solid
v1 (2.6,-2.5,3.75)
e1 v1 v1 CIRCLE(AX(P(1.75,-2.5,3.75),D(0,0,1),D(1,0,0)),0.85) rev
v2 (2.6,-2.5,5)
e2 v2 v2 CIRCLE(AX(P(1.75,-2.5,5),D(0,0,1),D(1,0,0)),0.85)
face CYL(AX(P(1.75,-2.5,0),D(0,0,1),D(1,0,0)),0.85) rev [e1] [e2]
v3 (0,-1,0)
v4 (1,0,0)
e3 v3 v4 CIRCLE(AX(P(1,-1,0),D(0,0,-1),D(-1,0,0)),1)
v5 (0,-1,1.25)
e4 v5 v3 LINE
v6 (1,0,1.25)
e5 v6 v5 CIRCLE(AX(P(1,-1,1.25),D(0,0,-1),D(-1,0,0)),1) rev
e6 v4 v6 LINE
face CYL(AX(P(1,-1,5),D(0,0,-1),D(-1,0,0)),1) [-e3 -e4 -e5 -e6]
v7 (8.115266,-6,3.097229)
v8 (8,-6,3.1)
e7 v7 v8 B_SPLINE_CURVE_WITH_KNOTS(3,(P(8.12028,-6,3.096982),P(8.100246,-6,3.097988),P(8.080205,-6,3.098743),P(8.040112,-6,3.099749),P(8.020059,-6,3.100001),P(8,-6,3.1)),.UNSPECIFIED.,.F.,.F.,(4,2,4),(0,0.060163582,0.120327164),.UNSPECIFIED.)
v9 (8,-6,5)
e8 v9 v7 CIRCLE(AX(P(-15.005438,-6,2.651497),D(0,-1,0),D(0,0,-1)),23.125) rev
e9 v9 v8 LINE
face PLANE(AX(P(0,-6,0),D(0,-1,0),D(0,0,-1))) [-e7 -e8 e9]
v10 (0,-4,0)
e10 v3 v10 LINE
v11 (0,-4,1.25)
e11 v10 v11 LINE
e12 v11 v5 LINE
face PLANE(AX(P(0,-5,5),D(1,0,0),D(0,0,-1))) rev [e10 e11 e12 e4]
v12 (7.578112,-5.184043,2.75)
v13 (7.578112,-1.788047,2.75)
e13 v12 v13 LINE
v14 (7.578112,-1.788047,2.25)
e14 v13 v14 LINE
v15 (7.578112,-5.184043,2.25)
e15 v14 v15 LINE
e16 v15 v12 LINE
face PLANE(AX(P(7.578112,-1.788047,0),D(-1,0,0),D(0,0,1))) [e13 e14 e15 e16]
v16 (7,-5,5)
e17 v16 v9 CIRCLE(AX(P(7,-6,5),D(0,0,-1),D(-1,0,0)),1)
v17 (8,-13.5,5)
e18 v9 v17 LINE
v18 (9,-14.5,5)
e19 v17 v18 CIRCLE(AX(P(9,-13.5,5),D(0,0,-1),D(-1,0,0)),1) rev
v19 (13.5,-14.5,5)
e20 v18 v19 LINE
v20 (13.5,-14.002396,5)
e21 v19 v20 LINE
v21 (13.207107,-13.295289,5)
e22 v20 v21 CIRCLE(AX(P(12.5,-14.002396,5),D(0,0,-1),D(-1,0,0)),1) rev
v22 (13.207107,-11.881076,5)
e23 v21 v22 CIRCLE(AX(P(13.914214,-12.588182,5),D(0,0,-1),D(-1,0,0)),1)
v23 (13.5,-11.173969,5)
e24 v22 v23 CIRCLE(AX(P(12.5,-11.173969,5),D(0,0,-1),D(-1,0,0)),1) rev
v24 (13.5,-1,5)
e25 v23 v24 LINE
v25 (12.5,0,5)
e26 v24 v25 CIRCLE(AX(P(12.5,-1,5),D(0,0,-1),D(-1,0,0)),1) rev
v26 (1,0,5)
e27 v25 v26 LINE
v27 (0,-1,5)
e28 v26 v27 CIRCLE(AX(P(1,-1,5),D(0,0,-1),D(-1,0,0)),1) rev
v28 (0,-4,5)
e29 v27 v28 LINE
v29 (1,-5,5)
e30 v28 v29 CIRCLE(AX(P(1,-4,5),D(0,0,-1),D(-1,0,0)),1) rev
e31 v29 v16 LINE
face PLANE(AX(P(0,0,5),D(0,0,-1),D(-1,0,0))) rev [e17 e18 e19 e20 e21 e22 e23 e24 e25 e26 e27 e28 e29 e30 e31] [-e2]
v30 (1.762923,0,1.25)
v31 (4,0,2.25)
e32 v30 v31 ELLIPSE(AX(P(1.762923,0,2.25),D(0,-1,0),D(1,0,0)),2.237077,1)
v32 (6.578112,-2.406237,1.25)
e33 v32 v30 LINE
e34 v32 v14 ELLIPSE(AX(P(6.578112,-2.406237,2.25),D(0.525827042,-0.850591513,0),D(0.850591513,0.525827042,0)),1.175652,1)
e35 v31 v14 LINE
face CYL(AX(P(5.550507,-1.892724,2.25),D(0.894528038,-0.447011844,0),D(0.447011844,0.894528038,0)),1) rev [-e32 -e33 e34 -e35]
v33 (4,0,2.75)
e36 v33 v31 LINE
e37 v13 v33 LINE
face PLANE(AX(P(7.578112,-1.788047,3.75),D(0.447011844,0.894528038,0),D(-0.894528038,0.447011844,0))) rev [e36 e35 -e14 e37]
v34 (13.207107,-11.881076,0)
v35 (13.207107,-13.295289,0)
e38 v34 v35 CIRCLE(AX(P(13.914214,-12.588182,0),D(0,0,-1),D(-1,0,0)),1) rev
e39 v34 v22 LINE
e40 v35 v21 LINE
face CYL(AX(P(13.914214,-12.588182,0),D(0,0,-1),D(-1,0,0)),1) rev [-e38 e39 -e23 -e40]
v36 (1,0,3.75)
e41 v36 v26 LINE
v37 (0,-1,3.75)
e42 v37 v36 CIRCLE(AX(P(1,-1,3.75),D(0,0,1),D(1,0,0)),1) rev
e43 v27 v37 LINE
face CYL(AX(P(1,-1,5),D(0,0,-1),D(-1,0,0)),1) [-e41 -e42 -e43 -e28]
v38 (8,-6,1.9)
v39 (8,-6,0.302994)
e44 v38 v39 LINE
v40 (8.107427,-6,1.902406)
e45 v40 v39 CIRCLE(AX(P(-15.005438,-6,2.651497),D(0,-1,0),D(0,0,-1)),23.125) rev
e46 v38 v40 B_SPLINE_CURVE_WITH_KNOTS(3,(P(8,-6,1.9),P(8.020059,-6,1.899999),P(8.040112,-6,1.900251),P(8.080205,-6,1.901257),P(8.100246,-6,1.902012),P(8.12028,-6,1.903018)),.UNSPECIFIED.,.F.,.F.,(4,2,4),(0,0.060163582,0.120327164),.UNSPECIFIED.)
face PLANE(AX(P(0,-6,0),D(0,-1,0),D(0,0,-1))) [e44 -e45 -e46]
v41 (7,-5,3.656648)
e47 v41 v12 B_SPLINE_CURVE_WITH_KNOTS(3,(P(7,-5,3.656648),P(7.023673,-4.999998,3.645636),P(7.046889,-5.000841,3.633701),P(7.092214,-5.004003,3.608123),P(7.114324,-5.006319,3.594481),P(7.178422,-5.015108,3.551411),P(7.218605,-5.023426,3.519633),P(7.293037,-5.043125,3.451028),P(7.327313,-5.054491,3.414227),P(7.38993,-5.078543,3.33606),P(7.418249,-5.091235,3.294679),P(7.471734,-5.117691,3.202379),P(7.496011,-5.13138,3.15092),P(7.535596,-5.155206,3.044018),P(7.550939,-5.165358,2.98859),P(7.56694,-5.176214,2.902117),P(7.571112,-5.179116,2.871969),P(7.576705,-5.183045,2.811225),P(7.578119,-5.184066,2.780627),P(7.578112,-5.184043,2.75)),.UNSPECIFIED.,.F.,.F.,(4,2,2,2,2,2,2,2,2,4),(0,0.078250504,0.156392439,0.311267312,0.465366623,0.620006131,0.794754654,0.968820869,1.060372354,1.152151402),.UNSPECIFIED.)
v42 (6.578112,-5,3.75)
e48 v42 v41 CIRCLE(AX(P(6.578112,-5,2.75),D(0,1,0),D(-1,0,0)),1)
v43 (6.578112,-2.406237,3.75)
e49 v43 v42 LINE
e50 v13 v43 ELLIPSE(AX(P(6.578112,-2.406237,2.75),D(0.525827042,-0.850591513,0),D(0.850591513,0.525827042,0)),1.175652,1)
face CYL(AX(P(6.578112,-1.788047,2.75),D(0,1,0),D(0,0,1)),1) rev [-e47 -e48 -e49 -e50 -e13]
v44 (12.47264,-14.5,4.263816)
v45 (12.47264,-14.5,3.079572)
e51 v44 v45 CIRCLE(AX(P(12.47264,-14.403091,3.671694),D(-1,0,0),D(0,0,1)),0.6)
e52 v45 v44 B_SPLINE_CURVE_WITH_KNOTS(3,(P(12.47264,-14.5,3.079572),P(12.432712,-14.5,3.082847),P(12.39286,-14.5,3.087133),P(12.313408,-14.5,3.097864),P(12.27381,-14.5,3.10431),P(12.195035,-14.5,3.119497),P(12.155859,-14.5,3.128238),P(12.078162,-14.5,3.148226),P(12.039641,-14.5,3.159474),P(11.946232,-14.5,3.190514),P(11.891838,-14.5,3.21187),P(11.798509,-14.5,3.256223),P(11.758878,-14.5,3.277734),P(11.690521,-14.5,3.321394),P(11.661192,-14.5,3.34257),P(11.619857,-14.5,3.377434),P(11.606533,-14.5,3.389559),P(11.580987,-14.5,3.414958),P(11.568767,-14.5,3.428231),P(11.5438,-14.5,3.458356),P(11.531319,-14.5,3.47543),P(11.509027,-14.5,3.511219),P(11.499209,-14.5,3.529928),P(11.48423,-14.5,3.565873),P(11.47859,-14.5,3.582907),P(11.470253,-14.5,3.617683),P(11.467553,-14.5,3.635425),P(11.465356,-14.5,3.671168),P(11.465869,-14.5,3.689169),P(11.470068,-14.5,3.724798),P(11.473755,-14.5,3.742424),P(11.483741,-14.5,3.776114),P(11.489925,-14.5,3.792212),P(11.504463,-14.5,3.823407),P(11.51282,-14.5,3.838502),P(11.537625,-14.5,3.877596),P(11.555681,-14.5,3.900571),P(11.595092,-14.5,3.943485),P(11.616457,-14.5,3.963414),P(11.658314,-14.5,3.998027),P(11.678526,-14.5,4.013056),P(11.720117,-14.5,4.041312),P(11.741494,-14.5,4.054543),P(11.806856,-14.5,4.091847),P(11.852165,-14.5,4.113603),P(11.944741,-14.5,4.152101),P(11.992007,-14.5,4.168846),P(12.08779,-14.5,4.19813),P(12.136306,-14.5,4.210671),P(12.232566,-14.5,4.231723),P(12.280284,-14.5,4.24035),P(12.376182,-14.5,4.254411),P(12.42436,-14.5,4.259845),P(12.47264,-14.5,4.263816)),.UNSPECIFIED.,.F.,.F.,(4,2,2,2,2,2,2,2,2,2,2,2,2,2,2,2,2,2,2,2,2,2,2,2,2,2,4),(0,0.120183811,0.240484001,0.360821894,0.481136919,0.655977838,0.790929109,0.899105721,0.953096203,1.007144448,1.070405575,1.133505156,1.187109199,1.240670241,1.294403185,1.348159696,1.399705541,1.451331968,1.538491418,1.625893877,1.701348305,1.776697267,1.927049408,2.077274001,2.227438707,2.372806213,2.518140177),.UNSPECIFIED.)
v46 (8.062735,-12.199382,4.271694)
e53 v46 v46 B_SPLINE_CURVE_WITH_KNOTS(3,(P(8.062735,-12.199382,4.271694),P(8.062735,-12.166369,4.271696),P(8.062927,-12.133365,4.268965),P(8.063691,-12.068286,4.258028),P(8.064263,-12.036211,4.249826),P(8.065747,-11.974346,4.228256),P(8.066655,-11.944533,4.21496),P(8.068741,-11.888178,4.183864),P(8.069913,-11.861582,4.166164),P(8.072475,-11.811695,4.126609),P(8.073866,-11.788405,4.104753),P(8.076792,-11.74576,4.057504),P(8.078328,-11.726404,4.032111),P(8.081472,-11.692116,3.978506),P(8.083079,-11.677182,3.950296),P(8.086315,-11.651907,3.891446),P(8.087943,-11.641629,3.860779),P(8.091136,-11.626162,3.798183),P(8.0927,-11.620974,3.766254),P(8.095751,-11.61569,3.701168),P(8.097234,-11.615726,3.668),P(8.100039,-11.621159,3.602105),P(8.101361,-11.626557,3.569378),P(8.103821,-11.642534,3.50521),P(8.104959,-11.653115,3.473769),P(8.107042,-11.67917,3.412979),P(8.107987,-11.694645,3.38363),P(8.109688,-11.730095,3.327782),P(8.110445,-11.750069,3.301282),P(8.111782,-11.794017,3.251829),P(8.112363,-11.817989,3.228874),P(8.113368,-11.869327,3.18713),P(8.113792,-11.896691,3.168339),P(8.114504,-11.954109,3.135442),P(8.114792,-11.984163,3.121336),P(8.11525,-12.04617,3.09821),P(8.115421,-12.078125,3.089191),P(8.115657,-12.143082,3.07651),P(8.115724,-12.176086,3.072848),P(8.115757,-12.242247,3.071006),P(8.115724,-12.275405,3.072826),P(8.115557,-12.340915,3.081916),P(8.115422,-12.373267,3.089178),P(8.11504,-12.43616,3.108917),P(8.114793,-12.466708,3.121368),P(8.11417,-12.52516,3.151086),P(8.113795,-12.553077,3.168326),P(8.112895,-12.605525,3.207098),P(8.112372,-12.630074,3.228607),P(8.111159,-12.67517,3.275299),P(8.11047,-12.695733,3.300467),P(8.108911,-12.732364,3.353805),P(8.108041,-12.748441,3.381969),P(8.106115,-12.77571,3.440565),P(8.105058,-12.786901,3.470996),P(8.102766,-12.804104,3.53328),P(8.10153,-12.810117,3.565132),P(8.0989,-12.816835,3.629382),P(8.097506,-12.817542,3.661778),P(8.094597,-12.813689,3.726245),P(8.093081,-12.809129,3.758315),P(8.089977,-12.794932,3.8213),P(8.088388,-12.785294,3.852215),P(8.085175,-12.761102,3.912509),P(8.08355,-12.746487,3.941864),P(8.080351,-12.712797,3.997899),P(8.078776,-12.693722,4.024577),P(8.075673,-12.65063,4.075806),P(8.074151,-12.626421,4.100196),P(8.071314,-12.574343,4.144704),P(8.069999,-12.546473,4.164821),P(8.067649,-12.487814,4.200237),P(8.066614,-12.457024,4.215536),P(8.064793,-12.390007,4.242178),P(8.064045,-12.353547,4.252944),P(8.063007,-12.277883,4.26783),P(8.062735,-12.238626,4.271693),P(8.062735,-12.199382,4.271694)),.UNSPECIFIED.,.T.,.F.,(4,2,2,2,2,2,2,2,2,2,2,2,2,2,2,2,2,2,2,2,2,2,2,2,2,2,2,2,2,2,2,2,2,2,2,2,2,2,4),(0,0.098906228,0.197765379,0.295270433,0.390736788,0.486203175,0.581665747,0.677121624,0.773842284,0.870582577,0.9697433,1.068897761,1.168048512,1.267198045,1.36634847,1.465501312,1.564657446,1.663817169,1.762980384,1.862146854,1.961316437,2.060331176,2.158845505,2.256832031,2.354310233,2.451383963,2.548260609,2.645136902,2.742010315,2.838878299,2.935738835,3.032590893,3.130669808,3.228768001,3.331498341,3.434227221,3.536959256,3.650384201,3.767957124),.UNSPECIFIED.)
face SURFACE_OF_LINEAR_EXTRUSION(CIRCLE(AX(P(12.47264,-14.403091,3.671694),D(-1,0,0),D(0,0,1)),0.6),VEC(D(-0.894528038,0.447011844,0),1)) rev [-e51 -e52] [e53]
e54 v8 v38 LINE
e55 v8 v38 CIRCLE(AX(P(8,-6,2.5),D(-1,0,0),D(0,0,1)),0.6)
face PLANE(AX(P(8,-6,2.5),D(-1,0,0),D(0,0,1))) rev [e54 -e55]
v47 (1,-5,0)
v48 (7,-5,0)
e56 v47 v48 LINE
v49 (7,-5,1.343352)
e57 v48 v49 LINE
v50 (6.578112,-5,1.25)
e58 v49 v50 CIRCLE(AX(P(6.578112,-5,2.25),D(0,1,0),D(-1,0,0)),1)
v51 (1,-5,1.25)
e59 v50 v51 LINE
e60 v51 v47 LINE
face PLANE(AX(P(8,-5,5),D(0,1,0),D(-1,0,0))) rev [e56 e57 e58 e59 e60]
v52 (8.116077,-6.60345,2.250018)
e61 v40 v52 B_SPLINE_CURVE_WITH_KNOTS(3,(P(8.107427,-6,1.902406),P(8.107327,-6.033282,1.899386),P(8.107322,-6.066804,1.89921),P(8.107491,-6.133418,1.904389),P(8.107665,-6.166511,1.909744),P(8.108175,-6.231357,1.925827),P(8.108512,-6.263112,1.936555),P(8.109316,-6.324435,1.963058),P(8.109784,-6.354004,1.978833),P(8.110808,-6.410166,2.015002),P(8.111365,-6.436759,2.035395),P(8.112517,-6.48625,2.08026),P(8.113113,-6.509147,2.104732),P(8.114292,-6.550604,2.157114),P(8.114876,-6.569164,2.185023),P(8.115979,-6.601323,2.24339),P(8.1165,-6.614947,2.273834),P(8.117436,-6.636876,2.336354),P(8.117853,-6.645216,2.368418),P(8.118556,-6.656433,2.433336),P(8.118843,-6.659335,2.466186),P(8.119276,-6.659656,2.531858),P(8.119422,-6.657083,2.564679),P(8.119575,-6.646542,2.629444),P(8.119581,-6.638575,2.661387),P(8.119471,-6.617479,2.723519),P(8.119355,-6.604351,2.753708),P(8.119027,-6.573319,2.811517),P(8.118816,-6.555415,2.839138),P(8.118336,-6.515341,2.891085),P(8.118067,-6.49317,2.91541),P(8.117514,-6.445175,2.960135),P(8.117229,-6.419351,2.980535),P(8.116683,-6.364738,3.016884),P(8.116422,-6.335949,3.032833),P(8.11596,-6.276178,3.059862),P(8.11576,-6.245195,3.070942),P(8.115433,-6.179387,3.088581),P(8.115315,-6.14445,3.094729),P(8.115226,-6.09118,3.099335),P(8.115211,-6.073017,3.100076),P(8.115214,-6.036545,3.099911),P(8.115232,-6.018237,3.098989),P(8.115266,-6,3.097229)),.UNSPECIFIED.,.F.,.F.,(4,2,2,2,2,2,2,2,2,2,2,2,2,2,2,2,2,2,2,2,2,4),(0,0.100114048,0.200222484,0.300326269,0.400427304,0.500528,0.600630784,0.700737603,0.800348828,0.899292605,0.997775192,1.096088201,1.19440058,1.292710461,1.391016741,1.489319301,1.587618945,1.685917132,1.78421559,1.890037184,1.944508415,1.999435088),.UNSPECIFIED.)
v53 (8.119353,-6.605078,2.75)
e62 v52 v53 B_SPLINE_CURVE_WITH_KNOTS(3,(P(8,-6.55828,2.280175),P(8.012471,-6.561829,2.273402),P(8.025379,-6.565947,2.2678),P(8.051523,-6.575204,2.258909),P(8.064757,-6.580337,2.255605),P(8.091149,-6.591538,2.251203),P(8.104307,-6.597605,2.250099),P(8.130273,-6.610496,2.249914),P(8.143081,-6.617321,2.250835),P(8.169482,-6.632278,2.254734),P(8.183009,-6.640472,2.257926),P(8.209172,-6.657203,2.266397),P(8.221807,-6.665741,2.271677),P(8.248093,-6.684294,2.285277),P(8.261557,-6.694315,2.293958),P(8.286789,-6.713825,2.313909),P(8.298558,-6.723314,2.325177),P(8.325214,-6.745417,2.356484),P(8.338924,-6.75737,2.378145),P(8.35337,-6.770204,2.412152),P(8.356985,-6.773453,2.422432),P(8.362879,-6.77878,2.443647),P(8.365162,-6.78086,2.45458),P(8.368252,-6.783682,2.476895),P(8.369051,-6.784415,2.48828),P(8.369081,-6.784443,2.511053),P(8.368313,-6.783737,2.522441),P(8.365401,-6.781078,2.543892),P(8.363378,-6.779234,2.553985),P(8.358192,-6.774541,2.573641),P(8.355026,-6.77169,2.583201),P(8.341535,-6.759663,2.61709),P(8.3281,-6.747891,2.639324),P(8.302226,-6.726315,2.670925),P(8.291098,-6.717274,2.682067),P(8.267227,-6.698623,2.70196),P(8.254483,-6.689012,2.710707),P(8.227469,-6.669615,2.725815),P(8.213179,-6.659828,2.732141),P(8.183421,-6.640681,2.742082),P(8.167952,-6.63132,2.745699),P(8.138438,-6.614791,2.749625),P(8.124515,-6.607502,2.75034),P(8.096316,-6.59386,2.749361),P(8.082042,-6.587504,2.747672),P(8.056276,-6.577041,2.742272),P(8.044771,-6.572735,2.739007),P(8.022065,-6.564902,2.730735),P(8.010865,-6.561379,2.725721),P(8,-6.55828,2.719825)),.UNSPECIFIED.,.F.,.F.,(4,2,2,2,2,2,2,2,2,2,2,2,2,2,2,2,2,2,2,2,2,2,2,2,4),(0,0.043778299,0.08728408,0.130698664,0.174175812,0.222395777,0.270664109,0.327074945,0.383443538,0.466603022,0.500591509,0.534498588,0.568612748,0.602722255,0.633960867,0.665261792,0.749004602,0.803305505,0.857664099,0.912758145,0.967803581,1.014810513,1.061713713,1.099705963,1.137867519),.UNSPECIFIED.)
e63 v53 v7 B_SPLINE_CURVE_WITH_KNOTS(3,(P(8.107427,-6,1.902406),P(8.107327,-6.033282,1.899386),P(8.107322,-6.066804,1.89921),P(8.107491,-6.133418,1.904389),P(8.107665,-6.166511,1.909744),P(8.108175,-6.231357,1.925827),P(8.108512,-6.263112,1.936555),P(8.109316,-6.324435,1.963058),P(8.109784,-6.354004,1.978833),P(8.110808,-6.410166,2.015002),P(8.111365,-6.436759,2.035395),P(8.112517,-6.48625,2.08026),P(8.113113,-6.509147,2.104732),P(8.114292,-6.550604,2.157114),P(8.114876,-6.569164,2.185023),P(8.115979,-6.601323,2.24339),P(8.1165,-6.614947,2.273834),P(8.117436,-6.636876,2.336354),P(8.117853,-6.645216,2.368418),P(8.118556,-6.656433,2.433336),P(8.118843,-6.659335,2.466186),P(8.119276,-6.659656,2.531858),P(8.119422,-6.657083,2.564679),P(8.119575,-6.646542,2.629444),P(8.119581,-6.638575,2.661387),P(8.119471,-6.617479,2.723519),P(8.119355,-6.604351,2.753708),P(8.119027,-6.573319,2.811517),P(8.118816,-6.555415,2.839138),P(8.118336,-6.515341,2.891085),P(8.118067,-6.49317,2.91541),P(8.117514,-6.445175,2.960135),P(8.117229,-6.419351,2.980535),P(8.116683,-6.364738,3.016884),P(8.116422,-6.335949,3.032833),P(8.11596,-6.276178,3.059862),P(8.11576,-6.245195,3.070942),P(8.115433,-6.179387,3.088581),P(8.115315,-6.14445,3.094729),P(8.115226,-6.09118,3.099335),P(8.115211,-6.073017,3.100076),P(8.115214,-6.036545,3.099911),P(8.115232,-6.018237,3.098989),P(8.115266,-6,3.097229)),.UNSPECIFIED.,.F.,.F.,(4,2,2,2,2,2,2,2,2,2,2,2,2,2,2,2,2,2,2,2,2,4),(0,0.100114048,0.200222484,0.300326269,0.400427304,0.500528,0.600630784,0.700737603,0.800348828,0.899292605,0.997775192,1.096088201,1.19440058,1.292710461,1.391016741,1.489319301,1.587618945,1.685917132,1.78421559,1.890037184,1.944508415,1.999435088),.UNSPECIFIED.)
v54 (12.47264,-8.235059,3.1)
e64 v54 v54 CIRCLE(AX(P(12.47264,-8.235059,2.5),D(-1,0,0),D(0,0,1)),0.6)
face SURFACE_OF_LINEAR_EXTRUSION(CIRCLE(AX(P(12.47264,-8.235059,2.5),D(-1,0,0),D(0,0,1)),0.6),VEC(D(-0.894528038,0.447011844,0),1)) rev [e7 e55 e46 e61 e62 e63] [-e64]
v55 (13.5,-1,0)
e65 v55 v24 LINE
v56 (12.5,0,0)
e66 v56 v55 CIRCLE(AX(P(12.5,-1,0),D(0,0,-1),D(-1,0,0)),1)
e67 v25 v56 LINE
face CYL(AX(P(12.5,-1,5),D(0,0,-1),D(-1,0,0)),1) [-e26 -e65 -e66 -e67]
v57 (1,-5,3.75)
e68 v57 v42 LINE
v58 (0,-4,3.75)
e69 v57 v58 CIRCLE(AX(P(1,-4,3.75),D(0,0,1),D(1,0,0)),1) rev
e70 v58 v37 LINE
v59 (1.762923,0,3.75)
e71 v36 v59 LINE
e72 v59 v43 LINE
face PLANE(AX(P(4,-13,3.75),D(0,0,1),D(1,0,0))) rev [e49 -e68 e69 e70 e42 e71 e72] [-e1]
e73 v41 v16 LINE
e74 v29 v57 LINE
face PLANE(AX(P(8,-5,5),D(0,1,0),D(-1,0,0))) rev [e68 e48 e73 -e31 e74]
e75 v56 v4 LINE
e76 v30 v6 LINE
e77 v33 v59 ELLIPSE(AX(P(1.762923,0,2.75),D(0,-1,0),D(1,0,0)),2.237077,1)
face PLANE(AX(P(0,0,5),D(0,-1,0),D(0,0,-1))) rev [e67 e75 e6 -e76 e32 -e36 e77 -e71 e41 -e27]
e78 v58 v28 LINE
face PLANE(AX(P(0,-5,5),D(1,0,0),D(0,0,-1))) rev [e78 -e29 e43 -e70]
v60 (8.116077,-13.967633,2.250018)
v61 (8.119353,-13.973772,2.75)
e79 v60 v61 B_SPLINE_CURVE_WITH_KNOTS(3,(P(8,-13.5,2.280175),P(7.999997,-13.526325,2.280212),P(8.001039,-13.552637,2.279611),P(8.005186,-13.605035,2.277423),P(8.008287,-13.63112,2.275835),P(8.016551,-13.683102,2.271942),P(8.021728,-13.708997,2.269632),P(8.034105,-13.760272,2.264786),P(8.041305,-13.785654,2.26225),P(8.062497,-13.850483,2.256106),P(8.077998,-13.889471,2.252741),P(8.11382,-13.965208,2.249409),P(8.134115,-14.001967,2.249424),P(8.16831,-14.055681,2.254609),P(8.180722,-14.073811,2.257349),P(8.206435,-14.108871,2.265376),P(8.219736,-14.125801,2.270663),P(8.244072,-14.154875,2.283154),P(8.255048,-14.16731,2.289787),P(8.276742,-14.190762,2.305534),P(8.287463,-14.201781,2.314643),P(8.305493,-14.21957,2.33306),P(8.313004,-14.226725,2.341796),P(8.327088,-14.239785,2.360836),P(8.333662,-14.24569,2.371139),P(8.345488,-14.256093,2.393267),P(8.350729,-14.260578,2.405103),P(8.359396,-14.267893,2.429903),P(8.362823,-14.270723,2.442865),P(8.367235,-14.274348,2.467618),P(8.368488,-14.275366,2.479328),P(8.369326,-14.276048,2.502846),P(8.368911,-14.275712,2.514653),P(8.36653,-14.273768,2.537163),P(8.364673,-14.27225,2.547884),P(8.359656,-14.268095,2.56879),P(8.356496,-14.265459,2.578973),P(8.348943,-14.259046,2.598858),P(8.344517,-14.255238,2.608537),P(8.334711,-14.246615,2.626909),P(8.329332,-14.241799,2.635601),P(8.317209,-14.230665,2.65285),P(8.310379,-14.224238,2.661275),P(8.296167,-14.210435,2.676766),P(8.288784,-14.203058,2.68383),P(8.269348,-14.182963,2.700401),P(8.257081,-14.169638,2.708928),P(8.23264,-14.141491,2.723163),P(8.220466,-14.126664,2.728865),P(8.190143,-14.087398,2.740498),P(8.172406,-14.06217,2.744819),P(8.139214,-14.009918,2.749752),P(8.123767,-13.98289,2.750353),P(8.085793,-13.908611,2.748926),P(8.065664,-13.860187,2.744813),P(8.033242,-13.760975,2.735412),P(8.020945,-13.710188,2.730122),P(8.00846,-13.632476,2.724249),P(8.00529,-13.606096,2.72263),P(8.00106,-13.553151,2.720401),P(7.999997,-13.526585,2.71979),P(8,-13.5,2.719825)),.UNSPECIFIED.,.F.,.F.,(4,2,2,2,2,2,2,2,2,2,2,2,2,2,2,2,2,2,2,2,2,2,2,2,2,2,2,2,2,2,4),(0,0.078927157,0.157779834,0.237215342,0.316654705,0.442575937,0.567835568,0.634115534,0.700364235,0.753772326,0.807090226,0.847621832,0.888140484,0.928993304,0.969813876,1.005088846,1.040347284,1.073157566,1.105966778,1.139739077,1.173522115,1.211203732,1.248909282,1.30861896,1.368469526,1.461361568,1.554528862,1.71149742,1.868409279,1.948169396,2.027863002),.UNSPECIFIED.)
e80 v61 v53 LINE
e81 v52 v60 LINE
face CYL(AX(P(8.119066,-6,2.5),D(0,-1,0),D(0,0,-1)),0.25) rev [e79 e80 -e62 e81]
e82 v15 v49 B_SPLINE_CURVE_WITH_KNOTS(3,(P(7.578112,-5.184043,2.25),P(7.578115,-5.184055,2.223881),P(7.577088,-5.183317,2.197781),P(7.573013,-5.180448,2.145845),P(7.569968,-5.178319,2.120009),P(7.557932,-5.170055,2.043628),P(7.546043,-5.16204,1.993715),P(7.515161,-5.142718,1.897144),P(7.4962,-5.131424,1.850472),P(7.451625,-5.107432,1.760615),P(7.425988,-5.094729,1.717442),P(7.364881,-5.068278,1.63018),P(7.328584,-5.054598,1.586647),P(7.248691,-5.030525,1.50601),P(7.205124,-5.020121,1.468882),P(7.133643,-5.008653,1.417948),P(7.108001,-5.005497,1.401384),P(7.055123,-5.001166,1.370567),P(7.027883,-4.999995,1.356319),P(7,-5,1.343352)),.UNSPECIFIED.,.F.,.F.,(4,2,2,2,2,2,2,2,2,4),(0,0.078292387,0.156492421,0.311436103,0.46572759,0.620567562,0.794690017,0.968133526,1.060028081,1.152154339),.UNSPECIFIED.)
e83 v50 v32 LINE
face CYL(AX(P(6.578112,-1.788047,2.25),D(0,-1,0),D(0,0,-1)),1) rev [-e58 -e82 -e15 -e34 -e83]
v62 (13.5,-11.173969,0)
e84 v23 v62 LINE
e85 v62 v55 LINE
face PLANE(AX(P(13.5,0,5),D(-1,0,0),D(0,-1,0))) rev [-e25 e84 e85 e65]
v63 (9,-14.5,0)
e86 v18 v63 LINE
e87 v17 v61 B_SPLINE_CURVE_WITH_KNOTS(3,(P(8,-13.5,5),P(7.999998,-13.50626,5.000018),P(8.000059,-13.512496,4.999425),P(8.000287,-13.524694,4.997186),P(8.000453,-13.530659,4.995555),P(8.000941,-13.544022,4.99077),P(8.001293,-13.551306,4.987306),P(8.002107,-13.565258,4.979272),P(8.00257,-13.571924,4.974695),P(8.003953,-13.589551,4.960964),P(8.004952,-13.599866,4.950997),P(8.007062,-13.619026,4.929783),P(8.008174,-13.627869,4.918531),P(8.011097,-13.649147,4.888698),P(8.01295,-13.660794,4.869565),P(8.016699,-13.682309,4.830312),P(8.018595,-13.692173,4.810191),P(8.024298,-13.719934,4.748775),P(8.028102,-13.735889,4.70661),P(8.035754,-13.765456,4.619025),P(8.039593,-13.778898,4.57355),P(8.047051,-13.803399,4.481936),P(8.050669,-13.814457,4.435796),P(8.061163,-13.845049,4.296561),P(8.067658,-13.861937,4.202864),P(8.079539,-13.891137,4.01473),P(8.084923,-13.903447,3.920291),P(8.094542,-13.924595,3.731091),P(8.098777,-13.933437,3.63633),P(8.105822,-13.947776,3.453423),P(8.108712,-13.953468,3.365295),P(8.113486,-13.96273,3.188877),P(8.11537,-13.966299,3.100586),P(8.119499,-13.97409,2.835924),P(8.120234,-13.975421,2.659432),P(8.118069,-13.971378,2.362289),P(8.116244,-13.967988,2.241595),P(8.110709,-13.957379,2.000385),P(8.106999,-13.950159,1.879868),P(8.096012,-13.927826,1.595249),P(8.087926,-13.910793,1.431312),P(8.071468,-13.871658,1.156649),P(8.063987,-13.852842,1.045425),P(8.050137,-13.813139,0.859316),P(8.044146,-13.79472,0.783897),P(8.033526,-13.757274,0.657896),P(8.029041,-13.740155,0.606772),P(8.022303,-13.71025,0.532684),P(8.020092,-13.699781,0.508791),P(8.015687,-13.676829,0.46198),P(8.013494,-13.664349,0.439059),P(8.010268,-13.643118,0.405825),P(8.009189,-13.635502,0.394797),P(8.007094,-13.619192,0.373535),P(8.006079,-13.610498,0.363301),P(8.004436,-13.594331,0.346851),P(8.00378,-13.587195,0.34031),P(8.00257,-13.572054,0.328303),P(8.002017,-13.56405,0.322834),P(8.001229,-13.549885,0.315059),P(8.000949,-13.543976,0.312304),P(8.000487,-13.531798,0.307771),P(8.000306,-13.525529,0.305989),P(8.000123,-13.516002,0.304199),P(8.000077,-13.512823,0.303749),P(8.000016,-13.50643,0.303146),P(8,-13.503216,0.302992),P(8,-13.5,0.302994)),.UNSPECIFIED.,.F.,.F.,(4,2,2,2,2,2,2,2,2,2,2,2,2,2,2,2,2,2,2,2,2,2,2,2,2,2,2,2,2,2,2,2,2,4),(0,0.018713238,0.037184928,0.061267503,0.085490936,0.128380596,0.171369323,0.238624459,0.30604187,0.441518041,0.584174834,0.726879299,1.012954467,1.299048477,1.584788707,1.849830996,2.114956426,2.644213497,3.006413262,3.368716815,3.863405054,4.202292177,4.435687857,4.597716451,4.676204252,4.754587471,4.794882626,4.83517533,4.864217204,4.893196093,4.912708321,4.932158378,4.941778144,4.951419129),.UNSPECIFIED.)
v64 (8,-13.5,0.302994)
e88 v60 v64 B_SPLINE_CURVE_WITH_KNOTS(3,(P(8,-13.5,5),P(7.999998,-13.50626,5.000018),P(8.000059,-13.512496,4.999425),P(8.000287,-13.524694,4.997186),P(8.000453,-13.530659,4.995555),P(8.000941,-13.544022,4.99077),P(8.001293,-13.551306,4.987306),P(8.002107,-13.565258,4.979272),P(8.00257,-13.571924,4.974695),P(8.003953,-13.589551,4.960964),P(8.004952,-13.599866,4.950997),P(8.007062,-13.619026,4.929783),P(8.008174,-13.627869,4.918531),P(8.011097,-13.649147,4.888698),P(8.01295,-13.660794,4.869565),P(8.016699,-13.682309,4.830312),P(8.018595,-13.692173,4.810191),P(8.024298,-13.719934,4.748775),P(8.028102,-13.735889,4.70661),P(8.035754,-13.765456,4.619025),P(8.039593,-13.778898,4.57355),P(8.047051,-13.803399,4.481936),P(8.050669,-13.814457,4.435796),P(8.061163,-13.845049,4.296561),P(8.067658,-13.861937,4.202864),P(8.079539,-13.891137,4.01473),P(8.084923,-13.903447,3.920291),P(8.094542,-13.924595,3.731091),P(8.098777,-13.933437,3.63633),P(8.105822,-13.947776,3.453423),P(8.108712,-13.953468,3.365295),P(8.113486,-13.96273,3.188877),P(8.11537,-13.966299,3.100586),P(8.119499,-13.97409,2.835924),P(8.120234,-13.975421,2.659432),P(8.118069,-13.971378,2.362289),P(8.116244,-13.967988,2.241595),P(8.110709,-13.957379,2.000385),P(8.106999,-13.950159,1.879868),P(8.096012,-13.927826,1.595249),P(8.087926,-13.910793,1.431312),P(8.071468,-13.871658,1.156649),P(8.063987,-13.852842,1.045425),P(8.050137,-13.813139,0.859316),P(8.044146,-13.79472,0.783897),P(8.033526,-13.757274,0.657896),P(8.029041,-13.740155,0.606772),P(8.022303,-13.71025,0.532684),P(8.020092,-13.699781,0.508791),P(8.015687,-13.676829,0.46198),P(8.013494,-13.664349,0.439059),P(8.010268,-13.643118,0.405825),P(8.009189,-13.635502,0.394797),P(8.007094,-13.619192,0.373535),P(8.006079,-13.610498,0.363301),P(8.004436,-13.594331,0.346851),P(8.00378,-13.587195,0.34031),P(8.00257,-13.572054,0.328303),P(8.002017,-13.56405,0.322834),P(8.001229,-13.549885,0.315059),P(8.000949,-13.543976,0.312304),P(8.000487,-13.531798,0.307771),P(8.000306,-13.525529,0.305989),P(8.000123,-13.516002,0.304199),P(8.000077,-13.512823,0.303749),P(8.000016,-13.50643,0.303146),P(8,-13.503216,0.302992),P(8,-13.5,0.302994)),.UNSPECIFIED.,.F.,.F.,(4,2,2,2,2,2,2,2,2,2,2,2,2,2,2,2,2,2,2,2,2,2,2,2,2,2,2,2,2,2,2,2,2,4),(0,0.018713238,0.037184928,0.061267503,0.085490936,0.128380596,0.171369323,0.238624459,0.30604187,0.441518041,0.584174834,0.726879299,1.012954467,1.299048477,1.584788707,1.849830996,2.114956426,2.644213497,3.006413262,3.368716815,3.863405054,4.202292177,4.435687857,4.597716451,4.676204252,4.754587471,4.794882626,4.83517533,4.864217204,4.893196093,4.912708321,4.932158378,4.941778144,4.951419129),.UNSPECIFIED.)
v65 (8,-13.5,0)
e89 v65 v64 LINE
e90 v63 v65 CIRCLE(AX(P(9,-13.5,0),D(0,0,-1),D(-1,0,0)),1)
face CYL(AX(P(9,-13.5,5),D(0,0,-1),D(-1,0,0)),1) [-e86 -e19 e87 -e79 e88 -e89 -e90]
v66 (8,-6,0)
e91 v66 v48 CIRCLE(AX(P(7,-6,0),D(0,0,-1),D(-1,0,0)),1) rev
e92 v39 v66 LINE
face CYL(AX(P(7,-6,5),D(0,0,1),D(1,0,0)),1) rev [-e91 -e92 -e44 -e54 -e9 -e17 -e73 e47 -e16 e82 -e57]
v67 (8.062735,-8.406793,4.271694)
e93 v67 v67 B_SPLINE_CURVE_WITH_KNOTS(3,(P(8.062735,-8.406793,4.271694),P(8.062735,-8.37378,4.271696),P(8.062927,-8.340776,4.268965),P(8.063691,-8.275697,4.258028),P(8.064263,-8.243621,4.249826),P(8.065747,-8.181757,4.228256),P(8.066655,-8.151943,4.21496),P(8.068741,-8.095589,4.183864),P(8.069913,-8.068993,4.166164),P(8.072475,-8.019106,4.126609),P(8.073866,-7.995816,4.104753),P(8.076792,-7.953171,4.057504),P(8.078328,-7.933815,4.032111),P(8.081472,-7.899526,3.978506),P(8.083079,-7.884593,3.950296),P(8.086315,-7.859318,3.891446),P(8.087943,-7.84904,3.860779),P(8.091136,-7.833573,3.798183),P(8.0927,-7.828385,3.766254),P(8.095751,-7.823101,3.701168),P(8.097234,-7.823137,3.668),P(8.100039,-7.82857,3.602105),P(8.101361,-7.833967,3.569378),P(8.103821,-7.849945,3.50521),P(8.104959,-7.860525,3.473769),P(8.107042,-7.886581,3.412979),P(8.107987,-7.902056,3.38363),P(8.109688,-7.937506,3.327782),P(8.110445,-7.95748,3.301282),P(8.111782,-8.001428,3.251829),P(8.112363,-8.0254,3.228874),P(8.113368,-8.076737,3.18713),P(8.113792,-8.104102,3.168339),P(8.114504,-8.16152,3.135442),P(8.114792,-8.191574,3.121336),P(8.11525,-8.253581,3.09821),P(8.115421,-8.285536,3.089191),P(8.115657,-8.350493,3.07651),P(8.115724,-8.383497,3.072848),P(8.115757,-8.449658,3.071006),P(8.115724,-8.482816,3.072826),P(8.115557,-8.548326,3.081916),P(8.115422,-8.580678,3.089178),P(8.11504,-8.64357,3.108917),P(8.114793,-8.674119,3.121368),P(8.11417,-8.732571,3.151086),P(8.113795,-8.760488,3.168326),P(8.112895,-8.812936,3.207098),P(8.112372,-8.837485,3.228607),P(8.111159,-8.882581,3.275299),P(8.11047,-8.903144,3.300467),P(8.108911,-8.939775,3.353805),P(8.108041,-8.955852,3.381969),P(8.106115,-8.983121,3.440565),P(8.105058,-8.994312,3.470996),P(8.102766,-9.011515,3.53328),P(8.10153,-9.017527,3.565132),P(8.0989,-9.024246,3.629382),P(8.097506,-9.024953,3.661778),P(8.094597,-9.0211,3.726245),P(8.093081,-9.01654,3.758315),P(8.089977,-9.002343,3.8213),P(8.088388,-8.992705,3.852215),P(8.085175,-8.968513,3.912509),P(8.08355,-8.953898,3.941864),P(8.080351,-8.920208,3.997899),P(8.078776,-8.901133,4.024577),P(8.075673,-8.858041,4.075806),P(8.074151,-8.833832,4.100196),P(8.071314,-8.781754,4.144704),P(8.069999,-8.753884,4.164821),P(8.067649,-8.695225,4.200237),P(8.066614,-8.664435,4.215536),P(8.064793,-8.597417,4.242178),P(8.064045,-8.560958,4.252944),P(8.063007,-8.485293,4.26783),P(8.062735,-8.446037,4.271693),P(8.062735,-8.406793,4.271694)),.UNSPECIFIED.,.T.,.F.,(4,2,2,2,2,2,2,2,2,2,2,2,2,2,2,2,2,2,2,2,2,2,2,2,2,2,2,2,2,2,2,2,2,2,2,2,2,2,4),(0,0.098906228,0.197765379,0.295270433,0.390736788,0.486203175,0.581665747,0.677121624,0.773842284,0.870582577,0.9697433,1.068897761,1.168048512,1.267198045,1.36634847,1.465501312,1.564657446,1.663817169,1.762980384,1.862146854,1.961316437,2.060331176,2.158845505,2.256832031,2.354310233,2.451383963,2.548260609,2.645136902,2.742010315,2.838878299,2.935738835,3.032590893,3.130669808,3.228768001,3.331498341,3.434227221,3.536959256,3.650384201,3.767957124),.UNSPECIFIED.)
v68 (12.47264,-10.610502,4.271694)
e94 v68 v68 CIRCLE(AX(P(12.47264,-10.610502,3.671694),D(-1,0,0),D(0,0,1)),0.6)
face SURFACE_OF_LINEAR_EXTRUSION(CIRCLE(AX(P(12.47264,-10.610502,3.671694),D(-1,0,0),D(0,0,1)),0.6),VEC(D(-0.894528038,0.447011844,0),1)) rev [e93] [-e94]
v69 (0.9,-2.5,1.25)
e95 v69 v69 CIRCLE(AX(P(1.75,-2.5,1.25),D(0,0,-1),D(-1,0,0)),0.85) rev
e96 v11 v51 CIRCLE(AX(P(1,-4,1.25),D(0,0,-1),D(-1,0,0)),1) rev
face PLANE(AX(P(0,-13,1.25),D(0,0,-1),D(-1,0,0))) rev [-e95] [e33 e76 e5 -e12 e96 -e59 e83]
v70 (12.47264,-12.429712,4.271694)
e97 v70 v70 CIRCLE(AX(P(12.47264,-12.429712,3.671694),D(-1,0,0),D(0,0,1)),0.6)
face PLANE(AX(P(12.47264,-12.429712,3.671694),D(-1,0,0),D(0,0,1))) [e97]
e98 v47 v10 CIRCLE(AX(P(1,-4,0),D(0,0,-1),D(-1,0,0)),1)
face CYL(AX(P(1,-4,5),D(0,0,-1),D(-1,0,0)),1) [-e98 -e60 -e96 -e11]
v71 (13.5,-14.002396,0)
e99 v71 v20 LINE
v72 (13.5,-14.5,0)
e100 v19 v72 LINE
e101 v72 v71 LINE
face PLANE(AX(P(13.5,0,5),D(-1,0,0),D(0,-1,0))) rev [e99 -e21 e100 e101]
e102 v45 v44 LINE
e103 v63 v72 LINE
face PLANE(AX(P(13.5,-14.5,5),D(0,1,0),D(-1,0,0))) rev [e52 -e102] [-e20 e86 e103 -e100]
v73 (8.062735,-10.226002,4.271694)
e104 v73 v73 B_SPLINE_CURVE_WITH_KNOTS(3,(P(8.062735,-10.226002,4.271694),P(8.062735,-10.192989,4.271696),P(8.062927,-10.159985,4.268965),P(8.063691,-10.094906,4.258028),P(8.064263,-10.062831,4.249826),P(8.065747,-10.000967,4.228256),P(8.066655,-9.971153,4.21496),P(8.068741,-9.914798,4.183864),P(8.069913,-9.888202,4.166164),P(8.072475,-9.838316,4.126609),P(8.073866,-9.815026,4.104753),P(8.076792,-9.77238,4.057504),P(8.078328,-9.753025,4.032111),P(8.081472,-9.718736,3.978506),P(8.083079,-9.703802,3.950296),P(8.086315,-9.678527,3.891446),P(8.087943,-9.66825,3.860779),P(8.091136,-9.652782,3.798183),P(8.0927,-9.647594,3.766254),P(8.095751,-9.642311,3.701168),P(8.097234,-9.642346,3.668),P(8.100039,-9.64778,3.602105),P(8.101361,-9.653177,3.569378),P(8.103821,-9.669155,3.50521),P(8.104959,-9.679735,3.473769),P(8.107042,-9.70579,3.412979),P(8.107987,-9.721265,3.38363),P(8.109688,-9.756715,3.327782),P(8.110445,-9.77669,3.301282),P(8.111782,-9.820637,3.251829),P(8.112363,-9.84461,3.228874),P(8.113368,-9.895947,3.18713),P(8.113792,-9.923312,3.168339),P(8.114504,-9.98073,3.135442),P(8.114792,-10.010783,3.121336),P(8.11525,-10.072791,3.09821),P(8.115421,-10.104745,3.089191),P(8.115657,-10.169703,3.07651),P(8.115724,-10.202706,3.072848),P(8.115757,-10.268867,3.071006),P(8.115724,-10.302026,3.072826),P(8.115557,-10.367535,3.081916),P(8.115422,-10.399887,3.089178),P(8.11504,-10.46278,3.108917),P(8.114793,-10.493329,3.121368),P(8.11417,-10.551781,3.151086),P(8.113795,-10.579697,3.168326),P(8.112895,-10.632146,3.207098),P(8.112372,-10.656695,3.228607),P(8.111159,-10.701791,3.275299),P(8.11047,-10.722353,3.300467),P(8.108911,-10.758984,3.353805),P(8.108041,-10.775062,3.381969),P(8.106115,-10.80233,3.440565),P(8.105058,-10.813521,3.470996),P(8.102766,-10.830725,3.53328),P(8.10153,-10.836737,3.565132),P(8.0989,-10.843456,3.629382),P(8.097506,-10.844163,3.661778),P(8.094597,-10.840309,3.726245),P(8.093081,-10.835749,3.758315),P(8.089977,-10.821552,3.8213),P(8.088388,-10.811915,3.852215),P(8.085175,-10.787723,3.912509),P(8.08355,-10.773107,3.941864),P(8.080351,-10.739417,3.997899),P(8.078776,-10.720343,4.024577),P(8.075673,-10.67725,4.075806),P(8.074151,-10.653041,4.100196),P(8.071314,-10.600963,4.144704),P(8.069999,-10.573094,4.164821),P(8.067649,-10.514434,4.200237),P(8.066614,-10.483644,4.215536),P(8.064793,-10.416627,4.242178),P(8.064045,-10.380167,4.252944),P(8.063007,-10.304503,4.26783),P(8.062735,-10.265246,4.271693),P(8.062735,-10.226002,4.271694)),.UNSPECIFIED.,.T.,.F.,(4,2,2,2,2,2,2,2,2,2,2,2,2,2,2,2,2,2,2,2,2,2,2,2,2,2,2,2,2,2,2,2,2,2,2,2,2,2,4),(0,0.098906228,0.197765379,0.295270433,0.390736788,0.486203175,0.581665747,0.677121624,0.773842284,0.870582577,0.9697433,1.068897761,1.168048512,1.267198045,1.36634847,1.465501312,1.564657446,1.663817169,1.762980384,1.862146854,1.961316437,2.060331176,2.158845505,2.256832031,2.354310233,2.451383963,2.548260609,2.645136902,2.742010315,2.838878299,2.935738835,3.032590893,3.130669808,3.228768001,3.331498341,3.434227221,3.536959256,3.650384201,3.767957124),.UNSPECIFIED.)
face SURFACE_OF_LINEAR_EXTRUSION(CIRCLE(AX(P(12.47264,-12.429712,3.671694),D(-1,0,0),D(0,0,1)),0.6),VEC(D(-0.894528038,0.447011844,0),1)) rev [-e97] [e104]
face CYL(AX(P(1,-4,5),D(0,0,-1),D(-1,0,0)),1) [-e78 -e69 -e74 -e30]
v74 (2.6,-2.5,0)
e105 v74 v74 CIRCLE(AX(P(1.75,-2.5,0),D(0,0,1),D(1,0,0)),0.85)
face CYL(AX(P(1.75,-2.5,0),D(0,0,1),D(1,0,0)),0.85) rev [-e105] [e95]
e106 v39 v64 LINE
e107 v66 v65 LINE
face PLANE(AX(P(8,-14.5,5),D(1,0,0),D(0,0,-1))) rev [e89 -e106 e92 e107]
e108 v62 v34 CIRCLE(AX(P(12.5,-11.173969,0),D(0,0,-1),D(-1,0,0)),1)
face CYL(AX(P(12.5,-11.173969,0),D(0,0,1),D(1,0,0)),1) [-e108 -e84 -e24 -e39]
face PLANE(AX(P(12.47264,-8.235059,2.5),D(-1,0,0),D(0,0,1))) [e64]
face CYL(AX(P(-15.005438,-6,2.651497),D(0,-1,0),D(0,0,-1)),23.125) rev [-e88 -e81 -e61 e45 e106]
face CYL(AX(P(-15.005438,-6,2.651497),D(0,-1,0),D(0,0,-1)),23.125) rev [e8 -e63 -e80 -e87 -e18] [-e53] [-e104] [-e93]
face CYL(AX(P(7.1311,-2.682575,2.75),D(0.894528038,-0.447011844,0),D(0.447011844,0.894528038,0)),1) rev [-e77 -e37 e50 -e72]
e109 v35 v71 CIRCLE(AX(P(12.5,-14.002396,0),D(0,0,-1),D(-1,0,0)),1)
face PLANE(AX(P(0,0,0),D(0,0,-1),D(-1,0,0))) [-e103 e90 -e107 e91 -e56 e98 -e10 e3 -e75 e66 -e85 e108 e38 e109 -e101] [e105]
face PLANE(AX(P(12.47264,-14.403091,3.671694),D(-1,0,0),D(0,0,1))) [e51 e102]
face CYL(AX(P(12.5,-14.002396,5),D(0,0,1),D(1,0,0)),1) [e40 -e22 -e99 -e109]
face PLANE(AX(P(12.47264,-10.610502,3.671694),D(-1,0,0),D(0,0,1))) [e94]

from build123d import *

# Parameters (mm, degrees)
BOSS_EXTRUDE1_DEPTH = 5
SKETCH4_R           = 0.85
CUT_EXTRUDE3_DEPTH  = 21.432816742
SKETCH5_W           = 4
SKETCH5_H           = 2.5
CUT_EXTRUDE4_DEPTH  = 13
FILLET4_R           = 1
CUT_EXTRUDE5_DEPTH  = 21.432816742
FILLET6_R           = 1
CUT_EXTRUDE6_START  = -8.5
CUT_EXTRUDE6_DEPTH  = 7.974174509
SKETCH11_W          = 2.5
SKETCH11_H          = 5
CUT_EXTRUDE8_DEPTH  = 4
SKETCH12_R          = 0.6
CUT_EXTRUDE9_DEPTH  = 5
SKETCH9_R           = 0.25
CUT_EXTRUDE10_DEPTH = 8.5
FILLET7_R           = 1


# Read off the part's stored shape, not the designer's step: Cut-Extrude6
with BuildPart() as part:
    # Sketch1 → Boss-Extrude1 (new body)
    with BuildSketch(Plane.XY):
        Polygon((0, 0), (13.5, 0), (13.5, -14.5), (8, -14.5), (8, -5), (0, -5), align=None)
    extrude(amount=BOSS_EXTRUDE1_DEPTH)

    # Sketch4 → Cut-Extrude3 (cut, through all)
    with BuildSketch(Plane.XY.offset(5)):
        with Locations((1.75, -2.5)):
            Circle(SKETCH4_R)
    extrude(amount=-CUT_EXTRUDE3_DEPTH, mode=Mode.SUBTRACT)

    # Sketch5 → Cut-Extrude4 (cut)
    with BuildSketch(Plane(origin=(0, 0, 0), x_dir=(1, 0, 0), z_dir=(0, 1, 0))):
        with Locations((2, -2.5)):
            Rectangle(SKETCH5_W, SKETCH5_H)
    extrude(amount=-CUT_EXTRUDE4_DEPTH, mode=Mode.SUBTRACT)

    # Fillet4
    fillet4_edges = [part.edges().sort_by_distance(p)[0] for p in [
        (0, 0, 4.375),
        (0, -5, 4.375),
        (0, 0, 0.625),
        (0, -5, 0.625),
    ]]
    fillet(fillet4_edges, radius=FILLET4_R)

    # Sketch6 → Cut-Extrude5 (cut, through all)
    with BuildSketch(Plane.XY.offset(5)):
        Polygon((13.5, -13.588182425), (12.5, -12.588182425), (13.5, -11.588182425), align=None)
    extrude(amount=-CUT_EXTRUDE5_DEPTH, mode=Mode.SUBTRACT)

    # Fillet6
    fillet6_edges = [part.edges().sort_by_distance(p)[0] for p in [
        (12.5, -12.588182425, 2.5),
        (13.5, -13.588182425, 2.5),
        (13.5, -11.588182425, 2.5),
        (8, -5, 2.5),
        (8, -14.5, 2.5),
        (13.5, 0, 2.5),
    ]]
    fillet(fillet6_edges, radius=FILLET6_R - 0.0001)  # a hair under: the kernel refuses the full size

    # Cut-Extrude6 outline → Cut-Extrude6 (cut)
    with BuildSketch(Plane.XZ.offset(14.5).offset(CUT_EXTRUDE6_START)):
        with BuildLine():
            Line((7.999994957, 5.000049402), (7.999994964, 0.302944212))
            ThreePointArc((7.999994964, 0.302944212), (8.119562434, 2.651496807), (7.999994957, 5.000049402))
        make_face()
    extrude(amount=CUT_EXTRUDE6_DEPTH, mode=Mode.SUBTRACT)

    # Sketch11 → Cut-Extrude8 (cut, along a direction that is not the sketch's normal)
    with BuildSketch(Plane.ZY.offset(-4)):
        with Locations((2.5, -2.5)):
            Rectangle(SKETCH11_W, SKETCH11_H)
    extrude(amount=-CUT_EXTRUDE8_DEPTH, dir=(-0.894528038262942, 0.4470118440952684, 0), mode=Mode.SUBTRACT)

    # Sketch12 → Cut-Extrude9 (cut, along a direction that is not the sketch's normal)
    with BuildSketch(Plane.ZY.offset(-8)):
        with Locations((3.671694189, -8.375443102)):
            Circle(SKETCH12_R)
        with Locations((3.671694189, -10.194652501)):
            Circle(SKETCH12_R)
        with Locations((3.671694189, -12.168032187)):
            Circle(SKETCH12_R)
        with Locations((2.5, -6)):
            Circle(SKETCH12_R)
    extrude(amount=-CUT_EXTRUDE9_DEPTH, dir=(-0.894528038262942, 0.4470118440952684, 0), mode=Mode.SUBTRACT)

    # Sketch9 → Cut-Extrude10 (cut)
    with BuildSketch(Plane.XZ.offset(14.5)):
        with Locations((8.119066185, 2.5)):
            Circle(SKETCH9_R)
    extrude(amount=-CUT_EXTRUDE10_DEPTH, mode=Mode.SUBTRACT)

    # Fillet7
    fillet7_edges = [part.edges().sort_by_distance(p)[0] for p in [
        (5.789056077, -0.894023688, 1.25),
        (5.789056077, -0.894023688, 3.75),
        (7.578112153, -3.486020884, 3.75),
        (7.578112153, -3.486020884, 1.25),
    ]]
    fillet(fillet7_edges, radius=FILLET7_R)


solid = part.part
